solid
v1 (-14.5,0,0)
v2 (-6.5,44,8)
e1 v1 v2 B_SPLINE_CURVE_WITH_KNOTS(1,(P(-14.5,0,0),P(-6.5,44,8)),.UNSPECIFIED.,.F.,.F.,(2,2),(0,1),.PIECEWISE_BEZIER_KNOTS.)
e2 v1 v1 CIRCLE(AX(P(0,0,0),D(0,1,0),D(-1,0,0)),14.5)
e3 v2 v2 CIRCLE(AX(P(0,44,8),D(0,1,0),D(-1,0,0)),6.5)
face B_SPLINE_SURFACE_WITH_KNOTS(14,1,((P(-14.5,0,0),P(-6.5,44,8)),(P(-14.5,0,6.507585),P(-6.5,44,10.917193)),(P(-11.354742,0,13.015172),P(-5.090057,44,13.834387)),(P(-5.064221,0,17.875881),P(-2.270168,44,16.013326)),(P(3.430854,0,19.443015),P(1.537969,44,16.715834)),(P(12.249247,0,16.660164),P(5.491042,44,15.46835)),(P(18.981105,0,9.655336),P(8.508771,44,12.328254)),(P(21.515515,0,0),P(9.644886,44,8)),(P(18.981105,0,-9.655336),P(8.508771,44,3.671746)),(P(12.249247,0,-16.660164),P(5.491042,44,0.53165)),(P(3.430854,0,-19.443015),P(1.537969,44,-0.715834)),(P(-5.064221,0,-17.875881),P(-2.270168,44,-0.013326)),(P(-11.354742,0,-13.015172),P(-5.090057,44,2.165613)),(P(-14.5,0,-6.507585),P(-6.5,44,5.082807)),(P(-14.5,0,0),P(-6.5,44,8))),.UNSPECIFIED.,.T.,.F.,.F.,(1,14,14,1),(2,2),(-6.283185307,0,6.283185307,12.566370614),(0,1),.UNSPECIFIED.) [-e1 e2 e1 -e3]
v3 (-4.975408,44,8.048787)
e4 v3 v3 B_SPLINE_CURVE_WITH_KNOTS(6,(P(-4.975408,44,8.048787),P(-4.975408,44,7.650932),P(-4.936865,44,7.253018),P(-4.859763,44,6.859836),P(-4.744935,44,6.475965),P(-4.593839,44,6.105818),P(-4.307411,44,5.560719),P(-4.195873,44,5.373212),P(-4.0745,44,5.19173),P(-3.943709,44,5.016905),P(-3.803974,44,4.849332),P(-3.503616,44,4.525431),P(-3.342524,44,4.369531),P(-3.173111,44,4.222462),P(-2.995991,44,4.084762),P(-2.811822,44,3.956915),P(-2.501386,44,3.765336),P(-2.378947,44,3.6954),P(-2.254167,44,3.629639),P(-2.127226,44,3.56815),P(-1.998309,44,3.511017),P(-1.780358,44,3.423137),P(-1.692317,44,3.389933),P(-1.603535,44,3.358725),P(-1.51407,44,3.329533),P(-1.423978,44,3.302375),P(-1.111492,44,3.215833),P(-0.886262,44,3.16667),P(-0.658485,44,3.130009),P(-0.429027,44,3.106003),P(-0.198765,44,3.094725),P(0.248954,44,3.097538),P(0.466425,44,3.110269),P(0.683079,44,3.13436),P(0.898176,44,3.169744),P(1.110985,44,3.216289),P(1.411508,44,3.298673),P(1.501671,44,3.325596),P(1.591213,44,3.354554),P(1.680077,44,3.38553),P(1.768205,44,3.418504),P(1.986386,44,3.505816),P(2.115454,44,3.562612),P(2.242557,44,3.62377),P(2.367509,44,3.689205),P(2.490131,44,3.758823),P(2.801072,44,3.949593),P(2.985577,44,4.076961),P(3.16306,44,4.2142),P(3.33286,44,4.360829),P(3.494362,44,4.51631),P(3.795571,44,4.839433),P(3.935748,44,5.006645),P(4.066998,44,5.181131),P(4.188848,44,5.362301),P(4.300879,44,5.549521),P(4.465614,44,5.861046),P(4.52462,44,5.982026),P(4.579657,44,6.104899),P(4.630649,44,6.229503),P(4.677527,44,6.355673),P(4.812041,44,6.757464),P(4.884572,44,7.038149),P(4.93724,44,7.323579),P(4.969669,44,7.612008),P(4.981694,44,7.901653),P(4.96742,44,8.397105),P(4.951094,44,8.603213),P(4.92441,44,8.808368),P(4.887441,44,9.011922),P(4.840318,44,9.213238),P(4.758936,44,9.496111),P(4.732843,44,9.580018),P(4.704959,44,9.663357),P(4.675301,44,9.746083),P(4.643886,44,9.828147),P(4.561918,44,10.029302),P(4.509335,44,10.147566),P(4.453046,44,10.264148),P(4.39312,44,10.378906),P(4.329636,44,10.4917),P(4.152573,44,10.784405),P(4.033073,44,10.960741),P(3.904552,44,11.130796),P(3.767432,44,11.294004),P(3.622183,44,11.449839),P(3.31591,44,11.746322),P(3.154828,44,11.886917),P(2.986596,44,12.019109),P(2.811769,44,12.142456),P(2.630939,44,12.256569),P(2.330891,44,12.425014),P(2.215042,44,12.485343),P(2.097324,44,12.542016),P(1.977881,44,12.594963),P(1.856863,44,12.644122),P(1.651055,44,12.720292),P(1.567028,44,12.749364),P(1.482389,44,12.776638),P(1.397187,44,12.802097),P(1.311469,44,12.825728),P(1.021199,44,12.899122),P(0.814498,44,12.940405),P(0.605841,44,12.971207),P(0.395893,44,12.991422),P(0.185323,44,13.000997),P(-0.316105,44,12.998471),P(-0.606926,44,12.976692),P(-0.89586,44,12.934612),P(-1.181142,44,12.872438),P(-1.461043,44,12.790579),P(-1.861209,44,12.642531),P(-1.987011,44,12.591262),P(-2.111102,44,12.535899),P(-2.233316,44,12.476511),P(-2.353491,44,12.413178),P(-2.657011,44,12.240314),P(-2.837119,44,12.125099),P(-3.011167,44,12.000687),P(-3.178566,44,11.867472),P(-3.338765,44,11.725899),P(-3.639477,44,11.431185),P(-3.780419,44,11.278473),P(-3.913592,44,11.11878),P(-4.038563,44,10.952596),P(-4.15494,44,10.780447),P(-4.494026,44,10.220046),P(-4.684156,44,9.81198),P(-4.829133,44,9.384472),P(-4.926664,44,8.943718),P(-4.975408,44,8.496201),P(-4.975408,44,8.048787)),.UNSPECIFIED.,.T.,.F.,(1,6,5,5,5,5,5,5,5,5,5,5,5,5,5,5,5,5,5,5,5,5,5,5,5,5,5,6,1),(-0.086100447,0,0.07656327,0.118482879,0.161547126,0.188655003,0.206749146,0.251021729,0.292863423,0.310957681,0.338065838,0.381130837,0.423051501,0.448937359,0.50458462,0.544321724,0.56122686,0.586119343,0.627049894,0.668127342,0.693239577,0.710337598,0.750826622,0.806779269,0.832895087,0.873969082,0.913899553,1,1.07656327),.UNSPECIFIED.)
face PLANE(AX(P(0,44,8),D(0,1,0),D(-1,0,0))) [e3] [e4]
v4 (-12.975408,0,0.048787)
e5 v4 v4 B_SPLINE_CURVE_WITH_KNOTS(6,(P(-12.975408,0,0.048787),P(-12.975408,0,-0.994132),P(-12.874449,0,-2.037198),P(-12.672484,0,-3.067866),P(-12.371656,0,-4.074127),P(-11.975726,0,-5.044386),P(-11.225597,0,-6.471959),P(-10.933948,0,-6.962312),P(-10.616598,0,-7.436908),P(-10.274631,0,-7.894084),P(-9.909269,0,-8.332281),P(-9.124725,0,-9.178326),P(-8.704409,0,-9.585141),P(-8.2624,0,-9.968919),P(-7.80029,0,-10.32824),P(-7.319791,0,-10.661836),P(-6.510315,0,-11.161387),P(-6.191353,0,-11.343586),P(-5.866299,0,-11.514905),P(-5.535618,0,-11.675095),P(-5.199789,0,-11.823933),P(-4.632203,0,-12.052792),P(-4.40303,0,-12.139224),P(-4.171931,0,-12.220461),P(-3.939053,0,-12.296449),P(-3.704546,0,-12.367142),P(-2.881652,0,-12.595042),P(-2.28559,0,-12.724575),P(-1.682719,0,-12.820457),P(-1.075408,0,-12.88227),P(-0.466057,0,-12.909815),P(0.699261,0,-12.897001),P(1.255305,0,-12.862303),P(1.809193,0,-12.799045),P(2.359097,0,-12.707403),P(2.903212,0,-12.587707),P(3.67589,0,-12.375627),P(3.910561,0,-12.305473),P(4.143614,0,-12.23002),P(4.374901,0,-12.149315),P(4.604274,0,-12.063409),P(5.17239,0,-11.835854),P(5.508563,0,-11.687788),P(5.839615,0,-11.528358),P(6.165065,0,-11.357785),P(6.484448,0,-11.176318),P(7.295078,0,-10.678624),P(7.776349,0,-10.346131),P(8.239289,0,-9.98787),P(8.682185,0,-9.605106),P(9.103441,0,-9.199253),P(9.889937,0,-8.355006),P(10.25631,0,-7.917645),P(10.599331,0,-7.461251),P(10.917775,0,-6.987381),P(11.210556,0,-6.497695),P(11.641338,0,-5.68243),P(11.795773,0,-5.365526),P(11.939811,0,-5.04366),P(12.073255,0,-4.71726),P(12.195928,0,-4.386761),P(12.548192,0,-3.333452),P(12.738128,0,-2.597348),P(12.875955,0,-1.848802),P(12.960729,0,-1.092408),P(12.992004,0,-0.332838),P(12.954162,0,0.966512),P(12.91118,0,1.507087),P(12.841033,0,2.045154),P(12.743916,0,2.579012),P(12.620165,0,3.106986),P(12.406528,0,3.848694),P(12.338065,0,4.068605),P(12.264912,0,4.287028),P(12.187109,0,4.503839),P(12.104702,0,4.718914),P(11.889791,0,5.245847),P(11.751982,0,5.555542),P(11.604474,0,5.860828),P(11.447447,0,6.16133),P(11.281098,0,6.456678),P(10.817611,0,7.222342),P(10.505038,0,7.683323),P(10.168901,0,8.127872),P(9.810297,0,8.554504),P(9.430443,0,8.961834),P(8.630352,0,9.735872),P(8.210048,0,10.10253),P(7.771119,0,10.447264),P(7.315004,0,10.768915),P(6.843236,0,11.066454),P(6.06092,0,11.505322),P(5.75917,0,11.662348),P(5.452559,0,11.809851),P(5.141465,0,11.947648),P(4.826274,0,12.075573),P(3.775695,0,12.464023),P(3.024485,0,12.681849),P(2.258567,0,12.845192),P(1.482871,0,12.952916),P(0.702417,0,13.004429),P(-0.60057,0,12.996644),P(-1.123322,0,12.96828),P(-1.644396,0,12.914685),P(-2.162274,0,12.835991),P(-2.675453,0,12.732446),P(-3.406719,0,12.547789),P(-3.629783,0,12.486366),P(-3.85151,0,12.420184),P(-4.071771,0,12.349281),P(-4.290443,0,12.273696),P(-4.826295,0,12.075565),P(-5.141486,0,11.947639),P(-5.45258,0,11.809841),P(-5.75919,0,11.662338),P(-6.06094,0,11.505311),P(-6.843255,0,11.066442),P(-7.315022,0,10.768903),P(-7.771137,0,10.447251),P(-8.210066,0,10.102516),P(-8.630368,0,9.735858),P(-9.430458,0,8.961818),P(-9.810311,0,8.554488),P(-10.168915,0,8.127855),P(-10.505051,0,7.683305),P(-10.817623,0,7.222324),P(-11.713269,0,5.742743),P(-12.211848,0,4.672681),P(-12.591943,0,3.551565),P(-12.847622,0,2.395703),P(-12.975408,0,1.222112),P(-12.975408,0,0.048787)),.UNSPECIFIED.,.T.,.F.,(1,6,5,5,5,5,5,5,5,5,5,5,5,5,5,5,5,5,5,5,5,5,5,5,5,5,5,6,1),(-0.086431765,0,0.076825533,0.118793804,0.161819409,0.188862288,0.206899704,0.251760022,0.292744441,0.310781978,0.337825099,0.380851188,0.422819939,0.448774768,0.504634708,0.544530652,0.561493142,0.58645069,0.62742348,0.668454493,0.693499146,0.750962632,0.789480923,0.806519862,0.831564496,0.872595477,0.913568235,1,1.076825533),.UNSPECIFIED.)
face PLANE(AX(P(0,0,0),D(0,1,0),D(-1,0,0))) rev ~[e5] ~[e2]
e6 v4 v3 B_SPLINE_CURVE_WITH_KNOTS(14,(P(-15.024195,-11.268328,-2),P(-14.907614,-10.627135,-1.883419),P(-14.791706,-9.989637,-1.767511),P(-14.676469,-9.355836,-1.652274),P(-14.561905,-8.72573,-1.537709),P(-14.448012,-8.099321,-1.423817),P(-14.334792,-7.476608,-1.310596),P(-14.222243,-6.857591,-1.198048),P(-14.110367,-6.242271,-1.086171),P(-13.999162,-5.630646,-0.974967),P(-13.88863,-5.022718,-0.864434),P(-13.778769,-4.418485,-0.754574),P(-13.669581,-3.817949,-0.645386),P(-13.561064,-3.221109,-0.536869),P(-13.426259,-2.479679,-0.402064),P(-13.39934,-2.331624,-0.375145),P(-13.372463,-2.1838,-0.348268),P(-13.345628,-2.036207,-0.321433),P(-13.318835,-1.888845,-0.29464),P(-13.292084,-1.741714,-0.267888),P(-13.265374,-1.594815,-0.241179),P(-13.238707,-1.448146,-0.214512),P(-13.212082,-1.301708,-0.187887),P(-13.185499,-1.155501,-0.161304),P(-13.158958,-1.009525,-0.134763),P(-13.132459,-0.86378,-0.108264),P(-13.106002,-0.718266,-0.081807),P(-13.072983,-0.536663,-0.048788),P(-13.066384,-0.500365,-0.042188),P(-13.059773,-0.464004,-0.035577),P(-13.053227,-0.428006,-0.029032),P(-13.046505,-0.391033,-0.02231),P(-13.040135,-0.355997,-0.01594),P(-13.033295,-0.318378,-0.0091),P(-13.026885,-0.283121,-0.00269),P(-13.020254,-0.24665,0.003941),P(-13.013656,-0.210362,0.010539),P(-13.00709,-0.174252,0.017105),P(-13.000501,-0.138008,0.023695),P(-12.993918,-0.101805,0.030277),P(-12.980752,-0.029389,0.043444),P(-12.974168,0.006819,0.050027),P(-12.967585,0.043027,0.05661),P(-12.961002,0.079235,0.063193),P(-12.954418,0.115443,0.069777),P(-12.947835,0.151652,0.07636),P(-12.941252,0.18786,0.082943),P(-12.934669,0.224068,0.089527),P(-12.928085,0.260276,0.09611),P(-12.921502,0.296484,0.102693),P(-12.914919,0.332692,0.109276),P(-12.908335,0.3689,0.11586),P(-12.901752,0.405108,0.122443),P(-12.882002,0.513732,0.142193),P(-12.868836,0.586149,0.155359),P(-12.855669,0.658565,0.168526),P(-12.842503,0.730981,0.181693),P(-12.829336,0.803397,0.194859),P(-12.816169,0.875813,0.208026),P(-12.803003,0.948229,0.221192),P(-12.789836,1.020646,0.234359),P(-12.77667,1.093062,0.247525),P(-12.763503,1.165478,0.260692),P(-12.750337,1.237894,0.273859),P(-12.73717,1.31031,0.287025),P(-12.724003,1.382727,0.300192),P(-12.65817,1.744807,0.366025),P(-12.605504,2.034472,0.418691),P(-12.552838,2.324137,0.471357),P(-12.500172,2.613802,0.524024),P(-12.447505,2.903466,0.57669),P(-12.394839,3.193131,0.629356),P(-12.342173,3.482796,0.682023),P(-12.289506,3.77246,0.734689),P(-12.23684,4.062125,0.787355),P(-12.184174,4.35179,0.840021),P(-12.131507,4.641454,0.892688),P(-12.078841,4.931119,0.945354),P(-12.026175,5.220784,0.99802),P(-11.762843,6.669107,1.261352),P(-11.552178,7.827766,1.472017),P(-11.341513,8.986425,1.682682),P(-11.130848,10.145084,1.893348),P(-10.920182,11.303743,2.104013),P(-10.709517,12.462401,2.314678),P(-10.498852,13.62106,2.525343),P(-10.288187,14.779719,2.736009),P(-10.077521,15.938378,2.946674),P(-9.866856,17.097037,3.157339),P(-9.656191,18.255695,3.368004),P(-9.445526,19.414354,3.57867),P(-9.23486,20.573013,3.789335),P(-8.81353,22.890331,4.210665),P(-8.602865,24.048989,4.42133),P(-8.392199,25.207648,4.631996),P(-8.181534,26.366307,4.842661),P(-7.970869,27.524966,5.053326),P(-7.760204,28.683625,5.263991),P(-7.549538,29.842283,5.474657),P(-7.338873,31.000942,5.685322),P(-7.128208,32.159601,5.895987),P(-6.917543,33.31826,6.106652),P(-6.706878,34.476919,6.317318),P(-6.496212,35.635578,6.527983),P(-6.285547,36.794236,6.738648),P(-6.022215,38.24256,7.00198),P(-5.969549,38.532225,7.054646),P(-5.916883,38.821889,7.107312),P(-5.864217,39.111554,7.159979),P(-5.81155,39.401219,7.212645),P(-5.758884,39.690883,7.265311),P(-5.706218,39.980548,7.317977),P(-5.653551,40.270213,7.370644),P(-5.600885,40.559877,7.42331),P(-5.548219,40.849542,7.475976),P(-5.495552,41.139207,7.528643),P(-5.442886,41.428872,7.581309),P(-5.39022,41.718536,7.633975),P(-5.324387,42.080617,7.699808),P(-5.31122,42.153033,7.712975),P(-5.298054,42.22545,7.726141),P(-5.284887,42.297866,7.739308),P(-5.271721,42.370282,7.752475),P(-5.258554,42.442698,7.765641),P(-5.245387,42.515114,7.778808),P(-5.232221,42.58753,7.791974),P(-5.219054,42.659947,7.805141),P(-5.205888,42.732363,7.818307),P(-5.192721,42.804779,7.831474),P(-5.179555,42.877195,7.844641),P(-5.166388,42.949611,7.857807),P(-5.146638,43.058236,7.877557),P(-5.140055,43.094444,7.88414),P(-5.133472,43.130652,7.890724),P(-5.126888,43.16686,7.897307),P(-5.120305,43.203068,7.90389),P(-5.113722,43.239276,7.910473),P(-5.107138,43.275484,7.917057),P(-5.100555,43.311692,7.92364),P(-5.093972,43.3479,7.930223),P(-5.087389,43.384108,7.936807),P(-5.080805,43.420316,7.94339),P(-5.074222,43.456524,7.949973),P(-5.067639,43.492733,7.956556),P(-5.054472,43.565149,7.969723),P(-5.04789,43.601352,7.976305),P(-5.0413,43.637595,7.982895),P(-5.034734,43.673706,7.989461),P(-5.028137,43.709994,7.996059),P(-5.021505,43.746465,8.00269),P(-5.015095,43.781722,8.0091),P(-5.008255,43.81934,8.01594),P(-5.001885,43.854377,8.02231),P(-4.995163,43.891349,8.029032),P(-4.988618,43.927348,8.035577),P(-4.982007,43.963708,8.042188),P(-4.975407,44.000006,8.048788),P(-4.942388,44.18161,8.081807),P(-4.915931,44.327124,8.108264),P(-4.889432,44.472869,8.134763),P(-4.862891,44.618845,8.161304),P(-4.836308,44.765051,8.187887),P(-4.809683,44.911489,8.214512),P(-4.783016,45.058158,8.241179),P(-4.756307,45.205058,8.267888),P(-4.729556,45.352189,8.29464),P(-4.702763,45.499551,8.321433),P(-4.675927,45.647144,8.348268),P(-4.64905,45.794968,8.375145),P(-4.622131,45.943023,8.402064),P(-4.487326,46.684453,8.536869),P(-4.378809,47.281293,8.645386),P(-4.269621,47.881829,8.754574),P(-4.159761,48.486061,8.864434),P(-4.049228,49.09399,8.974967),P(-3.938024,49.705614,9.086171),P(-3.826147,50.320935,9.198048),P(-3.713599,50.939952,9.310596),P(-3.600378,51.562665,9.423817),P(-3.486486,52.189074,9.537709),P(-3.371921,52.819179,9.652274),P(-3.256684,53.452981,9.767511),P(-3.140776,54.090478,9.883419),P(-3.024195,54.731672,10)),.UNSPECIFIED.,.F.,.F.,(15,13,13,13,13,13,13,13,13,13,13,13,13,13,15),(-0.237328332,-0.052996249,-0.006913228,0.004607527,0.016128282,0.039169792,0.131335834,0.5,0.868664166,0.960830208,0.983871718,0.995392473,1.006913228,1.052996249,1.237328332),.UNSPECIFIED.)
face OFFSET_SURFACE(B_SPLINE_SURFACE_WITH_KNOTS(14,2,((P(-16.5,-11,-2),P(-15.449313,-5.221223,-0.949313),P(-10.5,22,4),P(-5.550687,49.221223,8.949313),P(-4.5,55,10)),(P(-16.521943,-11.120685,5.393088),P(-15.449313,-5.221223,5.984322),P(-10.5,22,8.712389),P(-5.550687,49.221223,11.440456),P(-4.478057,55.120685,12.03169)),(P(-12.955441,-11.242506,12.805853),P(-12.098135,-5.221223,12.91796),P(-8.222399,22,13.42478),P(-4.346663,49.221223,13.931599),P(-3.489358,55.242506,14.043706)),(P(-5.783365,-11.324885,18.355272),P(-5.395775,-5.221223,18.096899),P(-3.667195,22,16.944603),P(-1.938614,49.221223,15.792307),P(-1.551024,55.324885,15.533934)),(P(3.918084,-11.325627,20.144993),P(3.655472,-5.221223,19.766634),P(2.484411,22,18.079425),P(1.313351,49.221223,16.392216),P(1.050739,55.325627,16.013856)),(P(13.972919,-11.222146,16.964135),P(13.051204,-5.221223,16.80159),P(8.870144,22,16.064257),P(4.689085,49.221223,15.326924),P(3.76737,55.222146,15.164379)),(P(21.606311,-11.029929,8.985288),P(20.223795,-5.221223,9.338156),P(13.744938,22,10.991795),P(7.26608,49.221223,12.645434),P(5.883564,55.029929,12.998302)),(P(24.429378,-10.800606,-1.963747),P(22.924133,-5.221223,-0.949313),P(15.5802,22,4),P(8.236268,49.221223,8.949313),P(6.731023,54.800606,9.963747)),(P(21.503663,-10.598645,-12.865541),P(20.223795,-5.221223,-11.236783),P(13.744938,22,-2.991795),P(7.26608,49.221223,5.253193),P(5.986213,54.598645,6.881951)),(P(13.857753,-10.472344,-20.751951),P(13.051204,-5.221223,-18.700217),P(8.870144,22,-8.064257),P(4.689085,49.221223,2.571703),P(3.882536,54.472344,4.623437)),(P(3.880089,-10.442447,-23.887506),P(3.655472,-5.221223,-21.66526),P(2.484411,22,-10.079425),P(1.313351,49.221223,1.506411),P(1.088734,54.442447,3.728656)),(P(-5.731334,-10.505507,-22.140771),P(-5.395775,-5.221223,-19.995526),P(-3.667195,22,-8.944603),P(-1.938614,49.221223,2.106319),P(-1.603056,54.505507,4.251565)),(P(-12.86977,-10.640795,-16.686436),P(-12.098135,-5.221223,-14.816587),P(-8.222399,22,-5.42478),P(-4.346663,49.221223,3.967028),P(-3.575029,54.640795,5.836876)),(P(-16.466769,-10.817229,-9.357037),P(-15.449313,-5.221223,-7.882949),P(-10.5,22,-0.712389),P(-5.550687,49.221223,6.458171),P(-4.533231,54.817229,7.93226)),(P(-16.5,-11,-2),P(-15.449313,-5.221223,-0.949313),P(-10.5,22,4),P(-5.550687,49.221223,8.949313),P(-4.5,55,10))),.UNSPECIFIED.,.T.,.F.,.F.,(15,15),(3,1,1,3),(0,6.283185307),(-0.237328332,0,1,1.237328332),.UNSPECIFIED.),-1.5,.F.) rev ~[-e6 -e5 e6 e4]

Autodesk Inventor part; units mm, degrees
ref_plane "YZ Plane" through (0, 0, 0) normal (1, 0, 0) x (0, 1, 0)
ref_plane "XY Plane" through (0, 0, 0) normal (0, 0, 1) x (1, 0, 0)
sketch "Szkic6" plane through (0, 0, 0) normal (0, 1, 0) x (-1, 0, 0)
  circle A0 centre (0, 0) radius 14.5
  dimension "d33" = 29
ref_plane "Płaszczyzna konstrukcyjna1" through (0, 44, 0) normal (0, 1, 0) x (-1, 0, 0)
sketch "Szkic7" plane through (0, 44, 0) normal (0, 1, 0) x (-1, 0, 0)
  circle A0 centre (0, 8) radius 6.5
  line L0 (0, -20.3) -> (0, 20.3) construction
  circle A1 centre (0, 0) radius 14.5 construction
  dimension "d35" = 13
loft "Wyciągnięcie złożone1" add profiles "Szkic6", "Szkic7"
shell "Skorupa1" thickness 1.5 removed faces 2 at (-1.1398, 44, 8.5185) at (1.052, 0, -3.5603)
equation "\"d33\" = OD1"
equation "\"d35\" = OD2"
equation "\"d52\" = THK"
equation "\"SzerokośćGięciaPodcięcia\" = Grubość"
equation "\"RozmiarPodcięciaNarożnika\" = 4 * Grubość"
equation "\"PromieńPrzejścia\" = PromieńGięcia"
equation "\"Rozmiar_promienia_Jacobiego\" = PromieńGięcia"
equation "\"Wielk_odstępu\" = Grubość"
equation "\"d2\" = PromieńGięcia"
equation "\"d23\" = PromieńGięcia"
equation "\"OD1\" = 29"
equation "\"OD2\" = 13"
equation "\"L\" = 44"
equation "\"THK\" = 1.5"
equation "\"d34\" = L"
equation "\"Grubość\" = 1.5"
equation "\"PromieńGięcia\" = 3"
properties part number "Redukcja asymetryczna Ø29x13x1,5 L=44" material "304"
